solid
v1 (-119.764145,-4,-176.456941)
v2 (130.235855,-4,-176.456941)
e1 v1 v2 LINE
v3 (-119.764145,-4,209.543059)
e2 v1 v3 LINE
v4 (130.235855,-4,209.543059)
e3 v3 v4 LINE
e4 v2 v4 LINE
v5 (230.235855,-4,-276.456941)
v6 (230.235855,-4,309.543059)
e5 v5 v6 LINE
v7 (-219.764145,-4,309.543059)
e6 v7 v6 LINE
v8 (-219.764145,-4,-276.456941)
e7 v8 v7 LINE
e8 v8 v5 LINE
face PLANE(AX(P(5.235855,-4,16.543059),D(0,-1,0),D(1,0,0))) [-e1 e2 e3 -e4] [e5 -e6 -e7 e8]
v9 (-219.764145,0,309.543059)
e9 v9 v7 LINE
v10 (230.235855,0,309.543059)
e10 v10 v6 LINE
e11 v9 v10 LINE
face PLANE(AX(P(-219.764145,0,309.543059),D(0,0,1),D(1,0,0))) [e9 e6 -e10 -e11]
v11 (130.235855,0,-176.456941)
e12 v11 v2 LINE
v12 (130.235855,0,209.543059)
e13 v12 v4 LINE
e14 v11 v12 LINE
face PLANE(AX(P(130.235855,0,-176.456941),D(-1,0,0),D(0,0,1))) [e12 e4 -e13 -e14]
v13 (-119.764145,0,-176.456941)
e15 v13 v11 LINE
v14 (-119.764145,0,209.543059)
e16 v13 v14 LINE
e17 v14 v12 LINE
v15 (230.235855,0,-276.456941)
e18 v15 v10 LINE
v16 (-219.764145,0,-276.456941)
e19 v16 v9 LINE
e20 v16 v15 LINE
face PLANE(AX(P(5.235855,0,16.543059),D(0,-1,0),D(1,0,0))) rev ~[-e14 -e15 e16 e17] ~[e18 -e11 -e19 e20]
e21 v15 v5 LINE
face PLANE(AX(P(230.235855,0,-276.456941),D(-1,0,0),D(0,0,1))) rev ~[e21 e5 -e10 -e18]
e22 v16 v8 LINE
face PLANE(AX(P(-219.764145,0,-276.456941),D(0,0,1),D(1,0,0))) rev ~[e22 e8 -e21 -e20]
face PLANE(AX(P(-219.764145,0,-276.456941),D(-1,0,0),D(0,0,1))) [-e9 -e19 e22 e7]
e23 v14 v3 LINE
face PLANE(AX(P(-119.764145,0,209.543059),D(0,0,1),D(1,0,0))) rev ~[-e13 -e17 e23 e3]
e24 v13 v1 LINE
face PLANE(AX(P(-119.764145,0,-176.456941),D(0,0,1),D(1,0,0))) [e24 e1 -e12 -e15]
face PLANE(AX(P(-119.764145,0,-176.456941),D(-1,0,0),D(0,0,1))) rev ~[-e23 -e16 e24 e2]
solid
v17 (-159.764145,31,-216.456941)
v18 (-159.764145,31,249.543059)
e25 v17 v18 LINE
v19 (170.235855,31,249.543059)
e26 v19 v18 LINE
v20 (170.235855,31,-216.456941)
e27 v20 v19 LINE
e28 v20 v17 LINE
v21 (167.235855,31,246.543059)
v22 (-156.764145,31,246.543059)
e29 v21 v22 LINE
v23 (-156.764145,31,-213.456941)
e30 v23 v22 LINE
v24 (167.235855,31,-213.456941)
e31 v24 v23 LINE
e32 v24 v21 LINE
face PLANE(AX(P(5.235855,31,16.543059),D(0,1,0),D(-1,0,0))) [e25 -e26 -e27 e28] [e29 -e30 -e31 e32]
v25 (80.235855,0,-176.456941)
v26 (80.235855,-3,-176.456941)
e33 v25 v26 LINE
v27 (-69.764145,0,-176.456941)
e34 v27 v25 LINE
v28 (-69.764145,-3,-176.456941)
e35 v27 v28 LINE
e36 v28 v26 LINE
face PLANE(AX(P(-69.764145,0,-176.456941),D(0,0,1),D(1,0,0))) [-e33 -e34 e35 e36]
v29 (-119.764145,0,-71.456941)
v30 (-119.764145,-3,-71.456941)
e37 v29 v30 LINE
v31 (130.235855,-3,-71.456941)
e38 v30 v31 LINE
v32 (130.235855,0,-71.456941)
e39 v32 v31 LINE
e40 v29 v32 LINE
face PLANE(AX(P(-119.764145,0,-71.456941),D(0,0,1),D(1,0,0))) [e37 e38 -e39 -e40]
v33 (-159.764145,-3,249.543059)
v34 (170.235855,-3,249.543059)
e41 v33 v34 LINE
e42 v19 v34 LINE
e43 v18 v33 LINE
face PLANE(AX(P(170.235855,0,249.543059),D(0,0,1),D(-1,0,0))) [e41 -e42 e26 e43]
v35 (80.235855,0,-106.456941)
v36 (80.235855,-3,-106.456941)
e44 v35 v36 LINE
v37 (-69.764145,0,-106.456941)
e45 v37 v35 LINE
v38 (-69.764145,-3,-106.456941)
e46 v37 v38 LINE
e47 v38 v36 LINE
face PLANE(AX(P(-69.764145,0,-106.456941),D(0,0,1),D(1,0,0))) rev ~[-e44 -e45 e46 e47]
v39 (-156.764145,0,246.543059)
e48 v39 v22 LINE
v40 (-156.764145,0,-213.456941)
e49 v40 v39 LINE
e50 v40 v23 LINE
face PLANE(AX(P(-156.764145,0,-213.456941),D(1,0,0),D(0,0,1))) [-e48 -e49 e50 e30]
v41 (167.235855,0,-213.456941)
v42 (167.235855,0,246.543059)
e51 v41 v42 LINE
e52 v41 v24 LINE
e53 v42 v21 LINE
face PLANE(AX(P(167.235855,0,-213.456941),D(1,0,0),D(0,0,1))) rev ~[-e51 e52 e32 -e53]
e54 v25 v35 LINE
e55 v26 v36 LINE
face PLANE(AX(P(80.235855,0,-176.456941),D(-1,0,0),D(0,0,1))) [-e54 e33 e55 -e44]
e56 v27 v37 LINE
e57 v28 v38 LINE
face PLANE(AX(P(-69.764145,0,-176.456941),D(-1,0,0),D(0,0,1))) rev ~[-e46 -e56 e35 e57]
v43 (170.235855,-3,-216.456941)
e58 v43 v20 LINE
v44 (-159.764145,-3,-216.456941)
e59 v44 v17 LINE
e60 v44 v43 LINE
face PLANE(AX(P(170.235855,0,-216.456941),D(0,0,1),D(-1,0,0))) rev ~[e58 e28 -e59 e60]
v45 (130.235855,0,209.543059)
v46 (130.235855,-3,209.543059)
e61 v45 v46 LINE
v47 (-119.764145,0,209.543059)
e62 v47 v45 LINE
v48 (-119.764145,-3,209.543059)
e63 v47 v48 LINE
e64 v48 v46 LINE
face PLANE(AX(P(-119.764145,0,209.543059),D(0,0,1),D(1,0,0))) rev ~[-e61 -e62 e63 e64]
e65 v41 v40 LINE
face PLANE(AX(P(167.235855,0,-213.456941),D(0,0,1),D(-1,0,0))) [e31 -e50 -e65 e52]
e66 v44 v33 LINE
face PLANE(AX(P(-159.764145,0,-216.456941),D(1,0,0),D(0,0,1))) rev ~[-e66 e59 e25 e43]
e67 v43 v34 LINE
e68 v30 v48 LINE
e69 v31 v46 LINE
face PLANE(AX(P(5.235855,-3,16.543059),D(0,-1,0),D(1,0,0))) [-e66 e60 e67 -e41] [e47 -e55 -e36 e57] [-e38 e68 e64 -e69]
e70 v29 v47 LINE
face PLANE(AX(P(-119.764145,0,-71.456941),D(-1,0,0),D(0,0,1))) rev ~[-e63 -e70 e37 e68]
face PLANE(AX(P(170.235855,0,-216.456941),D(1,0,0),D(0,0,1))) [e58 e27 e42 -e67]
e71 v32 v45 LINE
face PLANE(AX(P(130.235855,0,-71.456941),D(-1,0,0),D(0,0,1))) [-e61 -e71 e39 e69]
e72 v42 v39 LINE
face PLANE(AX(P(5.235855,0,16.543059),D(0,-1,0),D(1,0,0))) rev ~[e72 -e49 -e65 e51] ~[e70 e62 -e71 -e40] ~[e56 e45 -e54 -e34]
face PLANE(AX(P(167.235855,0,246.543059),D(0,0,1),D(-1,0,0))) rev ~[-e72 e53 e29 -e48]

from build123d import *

# Parameters (mm, degrees)
F0_W     = 450
F0_H     = 586
F0_W_2   = 250
F0_H_2   = 386
F1_DEPTH = 4
F2_W     = 330
F2_H     = 466
F2_W_2   = 150
F2_H_2   = 70
F2_W_3   = 250
F2_H_3   = 281
F3_DEPTH = 3
F4_W     = 330
F4_H     = 466
F4_W_2   = 324
F4_H_2   = 460
F5_DEPTH = 31


with BuildPart() as f1:
    # F0 (on Front) → F1 (new body)
    with BuildSketch(Plane.XZ):
        with Locations((5.2358553946, 16.5430586814)):
            Rectangle(F0_W, F0_H)
        with Locations((5.2358553946, 16.5430586814)):
            Rectangle(F0_W_2, F0_H_2, mode=Mode.SUBTRACT)
    extrude(amount=F1_DEPTH)


with BuildPart() as f3:
    # F2 (on Front) → F3 (new body)
    with BuildSketch(Plane.XZ):
        with Locations((5.2358553946, 16.5430586814)):
            Rectangle(F2_W, F2_H)
        with Locations((5.2358553946, -141.4569413186)):
            Rectangle(F2_W_2, F2_H_2, mode=Mode.SUBTRACT)
        with Locations((5.2358553946, 69.0430586814)):
            Rectangle(F2_W_3, F2_H_3, mode=Mode.SUBTRACT)
    extrude(amount=F3_DEPTH)

    # F4 (on face) → F5 (join)
    with BuildSketch(Plane(origin=(0, 0, 0), x_dir=(-1, 0, 0), z_dir=(0, 1, 0))):
        with Locations((-5.2358553946, 16.5430586814)):
            Rectangle(F4_W, F4_H)
        with Locations((-5.2358553946, 16.5430586814)):
            Rectangle(F4_W_2, F4_H_2, mode=Mode.SUBTRACT)
    extrude(amount=F5_DEPTH)


solid = Compound([f1.part, f3.part])
